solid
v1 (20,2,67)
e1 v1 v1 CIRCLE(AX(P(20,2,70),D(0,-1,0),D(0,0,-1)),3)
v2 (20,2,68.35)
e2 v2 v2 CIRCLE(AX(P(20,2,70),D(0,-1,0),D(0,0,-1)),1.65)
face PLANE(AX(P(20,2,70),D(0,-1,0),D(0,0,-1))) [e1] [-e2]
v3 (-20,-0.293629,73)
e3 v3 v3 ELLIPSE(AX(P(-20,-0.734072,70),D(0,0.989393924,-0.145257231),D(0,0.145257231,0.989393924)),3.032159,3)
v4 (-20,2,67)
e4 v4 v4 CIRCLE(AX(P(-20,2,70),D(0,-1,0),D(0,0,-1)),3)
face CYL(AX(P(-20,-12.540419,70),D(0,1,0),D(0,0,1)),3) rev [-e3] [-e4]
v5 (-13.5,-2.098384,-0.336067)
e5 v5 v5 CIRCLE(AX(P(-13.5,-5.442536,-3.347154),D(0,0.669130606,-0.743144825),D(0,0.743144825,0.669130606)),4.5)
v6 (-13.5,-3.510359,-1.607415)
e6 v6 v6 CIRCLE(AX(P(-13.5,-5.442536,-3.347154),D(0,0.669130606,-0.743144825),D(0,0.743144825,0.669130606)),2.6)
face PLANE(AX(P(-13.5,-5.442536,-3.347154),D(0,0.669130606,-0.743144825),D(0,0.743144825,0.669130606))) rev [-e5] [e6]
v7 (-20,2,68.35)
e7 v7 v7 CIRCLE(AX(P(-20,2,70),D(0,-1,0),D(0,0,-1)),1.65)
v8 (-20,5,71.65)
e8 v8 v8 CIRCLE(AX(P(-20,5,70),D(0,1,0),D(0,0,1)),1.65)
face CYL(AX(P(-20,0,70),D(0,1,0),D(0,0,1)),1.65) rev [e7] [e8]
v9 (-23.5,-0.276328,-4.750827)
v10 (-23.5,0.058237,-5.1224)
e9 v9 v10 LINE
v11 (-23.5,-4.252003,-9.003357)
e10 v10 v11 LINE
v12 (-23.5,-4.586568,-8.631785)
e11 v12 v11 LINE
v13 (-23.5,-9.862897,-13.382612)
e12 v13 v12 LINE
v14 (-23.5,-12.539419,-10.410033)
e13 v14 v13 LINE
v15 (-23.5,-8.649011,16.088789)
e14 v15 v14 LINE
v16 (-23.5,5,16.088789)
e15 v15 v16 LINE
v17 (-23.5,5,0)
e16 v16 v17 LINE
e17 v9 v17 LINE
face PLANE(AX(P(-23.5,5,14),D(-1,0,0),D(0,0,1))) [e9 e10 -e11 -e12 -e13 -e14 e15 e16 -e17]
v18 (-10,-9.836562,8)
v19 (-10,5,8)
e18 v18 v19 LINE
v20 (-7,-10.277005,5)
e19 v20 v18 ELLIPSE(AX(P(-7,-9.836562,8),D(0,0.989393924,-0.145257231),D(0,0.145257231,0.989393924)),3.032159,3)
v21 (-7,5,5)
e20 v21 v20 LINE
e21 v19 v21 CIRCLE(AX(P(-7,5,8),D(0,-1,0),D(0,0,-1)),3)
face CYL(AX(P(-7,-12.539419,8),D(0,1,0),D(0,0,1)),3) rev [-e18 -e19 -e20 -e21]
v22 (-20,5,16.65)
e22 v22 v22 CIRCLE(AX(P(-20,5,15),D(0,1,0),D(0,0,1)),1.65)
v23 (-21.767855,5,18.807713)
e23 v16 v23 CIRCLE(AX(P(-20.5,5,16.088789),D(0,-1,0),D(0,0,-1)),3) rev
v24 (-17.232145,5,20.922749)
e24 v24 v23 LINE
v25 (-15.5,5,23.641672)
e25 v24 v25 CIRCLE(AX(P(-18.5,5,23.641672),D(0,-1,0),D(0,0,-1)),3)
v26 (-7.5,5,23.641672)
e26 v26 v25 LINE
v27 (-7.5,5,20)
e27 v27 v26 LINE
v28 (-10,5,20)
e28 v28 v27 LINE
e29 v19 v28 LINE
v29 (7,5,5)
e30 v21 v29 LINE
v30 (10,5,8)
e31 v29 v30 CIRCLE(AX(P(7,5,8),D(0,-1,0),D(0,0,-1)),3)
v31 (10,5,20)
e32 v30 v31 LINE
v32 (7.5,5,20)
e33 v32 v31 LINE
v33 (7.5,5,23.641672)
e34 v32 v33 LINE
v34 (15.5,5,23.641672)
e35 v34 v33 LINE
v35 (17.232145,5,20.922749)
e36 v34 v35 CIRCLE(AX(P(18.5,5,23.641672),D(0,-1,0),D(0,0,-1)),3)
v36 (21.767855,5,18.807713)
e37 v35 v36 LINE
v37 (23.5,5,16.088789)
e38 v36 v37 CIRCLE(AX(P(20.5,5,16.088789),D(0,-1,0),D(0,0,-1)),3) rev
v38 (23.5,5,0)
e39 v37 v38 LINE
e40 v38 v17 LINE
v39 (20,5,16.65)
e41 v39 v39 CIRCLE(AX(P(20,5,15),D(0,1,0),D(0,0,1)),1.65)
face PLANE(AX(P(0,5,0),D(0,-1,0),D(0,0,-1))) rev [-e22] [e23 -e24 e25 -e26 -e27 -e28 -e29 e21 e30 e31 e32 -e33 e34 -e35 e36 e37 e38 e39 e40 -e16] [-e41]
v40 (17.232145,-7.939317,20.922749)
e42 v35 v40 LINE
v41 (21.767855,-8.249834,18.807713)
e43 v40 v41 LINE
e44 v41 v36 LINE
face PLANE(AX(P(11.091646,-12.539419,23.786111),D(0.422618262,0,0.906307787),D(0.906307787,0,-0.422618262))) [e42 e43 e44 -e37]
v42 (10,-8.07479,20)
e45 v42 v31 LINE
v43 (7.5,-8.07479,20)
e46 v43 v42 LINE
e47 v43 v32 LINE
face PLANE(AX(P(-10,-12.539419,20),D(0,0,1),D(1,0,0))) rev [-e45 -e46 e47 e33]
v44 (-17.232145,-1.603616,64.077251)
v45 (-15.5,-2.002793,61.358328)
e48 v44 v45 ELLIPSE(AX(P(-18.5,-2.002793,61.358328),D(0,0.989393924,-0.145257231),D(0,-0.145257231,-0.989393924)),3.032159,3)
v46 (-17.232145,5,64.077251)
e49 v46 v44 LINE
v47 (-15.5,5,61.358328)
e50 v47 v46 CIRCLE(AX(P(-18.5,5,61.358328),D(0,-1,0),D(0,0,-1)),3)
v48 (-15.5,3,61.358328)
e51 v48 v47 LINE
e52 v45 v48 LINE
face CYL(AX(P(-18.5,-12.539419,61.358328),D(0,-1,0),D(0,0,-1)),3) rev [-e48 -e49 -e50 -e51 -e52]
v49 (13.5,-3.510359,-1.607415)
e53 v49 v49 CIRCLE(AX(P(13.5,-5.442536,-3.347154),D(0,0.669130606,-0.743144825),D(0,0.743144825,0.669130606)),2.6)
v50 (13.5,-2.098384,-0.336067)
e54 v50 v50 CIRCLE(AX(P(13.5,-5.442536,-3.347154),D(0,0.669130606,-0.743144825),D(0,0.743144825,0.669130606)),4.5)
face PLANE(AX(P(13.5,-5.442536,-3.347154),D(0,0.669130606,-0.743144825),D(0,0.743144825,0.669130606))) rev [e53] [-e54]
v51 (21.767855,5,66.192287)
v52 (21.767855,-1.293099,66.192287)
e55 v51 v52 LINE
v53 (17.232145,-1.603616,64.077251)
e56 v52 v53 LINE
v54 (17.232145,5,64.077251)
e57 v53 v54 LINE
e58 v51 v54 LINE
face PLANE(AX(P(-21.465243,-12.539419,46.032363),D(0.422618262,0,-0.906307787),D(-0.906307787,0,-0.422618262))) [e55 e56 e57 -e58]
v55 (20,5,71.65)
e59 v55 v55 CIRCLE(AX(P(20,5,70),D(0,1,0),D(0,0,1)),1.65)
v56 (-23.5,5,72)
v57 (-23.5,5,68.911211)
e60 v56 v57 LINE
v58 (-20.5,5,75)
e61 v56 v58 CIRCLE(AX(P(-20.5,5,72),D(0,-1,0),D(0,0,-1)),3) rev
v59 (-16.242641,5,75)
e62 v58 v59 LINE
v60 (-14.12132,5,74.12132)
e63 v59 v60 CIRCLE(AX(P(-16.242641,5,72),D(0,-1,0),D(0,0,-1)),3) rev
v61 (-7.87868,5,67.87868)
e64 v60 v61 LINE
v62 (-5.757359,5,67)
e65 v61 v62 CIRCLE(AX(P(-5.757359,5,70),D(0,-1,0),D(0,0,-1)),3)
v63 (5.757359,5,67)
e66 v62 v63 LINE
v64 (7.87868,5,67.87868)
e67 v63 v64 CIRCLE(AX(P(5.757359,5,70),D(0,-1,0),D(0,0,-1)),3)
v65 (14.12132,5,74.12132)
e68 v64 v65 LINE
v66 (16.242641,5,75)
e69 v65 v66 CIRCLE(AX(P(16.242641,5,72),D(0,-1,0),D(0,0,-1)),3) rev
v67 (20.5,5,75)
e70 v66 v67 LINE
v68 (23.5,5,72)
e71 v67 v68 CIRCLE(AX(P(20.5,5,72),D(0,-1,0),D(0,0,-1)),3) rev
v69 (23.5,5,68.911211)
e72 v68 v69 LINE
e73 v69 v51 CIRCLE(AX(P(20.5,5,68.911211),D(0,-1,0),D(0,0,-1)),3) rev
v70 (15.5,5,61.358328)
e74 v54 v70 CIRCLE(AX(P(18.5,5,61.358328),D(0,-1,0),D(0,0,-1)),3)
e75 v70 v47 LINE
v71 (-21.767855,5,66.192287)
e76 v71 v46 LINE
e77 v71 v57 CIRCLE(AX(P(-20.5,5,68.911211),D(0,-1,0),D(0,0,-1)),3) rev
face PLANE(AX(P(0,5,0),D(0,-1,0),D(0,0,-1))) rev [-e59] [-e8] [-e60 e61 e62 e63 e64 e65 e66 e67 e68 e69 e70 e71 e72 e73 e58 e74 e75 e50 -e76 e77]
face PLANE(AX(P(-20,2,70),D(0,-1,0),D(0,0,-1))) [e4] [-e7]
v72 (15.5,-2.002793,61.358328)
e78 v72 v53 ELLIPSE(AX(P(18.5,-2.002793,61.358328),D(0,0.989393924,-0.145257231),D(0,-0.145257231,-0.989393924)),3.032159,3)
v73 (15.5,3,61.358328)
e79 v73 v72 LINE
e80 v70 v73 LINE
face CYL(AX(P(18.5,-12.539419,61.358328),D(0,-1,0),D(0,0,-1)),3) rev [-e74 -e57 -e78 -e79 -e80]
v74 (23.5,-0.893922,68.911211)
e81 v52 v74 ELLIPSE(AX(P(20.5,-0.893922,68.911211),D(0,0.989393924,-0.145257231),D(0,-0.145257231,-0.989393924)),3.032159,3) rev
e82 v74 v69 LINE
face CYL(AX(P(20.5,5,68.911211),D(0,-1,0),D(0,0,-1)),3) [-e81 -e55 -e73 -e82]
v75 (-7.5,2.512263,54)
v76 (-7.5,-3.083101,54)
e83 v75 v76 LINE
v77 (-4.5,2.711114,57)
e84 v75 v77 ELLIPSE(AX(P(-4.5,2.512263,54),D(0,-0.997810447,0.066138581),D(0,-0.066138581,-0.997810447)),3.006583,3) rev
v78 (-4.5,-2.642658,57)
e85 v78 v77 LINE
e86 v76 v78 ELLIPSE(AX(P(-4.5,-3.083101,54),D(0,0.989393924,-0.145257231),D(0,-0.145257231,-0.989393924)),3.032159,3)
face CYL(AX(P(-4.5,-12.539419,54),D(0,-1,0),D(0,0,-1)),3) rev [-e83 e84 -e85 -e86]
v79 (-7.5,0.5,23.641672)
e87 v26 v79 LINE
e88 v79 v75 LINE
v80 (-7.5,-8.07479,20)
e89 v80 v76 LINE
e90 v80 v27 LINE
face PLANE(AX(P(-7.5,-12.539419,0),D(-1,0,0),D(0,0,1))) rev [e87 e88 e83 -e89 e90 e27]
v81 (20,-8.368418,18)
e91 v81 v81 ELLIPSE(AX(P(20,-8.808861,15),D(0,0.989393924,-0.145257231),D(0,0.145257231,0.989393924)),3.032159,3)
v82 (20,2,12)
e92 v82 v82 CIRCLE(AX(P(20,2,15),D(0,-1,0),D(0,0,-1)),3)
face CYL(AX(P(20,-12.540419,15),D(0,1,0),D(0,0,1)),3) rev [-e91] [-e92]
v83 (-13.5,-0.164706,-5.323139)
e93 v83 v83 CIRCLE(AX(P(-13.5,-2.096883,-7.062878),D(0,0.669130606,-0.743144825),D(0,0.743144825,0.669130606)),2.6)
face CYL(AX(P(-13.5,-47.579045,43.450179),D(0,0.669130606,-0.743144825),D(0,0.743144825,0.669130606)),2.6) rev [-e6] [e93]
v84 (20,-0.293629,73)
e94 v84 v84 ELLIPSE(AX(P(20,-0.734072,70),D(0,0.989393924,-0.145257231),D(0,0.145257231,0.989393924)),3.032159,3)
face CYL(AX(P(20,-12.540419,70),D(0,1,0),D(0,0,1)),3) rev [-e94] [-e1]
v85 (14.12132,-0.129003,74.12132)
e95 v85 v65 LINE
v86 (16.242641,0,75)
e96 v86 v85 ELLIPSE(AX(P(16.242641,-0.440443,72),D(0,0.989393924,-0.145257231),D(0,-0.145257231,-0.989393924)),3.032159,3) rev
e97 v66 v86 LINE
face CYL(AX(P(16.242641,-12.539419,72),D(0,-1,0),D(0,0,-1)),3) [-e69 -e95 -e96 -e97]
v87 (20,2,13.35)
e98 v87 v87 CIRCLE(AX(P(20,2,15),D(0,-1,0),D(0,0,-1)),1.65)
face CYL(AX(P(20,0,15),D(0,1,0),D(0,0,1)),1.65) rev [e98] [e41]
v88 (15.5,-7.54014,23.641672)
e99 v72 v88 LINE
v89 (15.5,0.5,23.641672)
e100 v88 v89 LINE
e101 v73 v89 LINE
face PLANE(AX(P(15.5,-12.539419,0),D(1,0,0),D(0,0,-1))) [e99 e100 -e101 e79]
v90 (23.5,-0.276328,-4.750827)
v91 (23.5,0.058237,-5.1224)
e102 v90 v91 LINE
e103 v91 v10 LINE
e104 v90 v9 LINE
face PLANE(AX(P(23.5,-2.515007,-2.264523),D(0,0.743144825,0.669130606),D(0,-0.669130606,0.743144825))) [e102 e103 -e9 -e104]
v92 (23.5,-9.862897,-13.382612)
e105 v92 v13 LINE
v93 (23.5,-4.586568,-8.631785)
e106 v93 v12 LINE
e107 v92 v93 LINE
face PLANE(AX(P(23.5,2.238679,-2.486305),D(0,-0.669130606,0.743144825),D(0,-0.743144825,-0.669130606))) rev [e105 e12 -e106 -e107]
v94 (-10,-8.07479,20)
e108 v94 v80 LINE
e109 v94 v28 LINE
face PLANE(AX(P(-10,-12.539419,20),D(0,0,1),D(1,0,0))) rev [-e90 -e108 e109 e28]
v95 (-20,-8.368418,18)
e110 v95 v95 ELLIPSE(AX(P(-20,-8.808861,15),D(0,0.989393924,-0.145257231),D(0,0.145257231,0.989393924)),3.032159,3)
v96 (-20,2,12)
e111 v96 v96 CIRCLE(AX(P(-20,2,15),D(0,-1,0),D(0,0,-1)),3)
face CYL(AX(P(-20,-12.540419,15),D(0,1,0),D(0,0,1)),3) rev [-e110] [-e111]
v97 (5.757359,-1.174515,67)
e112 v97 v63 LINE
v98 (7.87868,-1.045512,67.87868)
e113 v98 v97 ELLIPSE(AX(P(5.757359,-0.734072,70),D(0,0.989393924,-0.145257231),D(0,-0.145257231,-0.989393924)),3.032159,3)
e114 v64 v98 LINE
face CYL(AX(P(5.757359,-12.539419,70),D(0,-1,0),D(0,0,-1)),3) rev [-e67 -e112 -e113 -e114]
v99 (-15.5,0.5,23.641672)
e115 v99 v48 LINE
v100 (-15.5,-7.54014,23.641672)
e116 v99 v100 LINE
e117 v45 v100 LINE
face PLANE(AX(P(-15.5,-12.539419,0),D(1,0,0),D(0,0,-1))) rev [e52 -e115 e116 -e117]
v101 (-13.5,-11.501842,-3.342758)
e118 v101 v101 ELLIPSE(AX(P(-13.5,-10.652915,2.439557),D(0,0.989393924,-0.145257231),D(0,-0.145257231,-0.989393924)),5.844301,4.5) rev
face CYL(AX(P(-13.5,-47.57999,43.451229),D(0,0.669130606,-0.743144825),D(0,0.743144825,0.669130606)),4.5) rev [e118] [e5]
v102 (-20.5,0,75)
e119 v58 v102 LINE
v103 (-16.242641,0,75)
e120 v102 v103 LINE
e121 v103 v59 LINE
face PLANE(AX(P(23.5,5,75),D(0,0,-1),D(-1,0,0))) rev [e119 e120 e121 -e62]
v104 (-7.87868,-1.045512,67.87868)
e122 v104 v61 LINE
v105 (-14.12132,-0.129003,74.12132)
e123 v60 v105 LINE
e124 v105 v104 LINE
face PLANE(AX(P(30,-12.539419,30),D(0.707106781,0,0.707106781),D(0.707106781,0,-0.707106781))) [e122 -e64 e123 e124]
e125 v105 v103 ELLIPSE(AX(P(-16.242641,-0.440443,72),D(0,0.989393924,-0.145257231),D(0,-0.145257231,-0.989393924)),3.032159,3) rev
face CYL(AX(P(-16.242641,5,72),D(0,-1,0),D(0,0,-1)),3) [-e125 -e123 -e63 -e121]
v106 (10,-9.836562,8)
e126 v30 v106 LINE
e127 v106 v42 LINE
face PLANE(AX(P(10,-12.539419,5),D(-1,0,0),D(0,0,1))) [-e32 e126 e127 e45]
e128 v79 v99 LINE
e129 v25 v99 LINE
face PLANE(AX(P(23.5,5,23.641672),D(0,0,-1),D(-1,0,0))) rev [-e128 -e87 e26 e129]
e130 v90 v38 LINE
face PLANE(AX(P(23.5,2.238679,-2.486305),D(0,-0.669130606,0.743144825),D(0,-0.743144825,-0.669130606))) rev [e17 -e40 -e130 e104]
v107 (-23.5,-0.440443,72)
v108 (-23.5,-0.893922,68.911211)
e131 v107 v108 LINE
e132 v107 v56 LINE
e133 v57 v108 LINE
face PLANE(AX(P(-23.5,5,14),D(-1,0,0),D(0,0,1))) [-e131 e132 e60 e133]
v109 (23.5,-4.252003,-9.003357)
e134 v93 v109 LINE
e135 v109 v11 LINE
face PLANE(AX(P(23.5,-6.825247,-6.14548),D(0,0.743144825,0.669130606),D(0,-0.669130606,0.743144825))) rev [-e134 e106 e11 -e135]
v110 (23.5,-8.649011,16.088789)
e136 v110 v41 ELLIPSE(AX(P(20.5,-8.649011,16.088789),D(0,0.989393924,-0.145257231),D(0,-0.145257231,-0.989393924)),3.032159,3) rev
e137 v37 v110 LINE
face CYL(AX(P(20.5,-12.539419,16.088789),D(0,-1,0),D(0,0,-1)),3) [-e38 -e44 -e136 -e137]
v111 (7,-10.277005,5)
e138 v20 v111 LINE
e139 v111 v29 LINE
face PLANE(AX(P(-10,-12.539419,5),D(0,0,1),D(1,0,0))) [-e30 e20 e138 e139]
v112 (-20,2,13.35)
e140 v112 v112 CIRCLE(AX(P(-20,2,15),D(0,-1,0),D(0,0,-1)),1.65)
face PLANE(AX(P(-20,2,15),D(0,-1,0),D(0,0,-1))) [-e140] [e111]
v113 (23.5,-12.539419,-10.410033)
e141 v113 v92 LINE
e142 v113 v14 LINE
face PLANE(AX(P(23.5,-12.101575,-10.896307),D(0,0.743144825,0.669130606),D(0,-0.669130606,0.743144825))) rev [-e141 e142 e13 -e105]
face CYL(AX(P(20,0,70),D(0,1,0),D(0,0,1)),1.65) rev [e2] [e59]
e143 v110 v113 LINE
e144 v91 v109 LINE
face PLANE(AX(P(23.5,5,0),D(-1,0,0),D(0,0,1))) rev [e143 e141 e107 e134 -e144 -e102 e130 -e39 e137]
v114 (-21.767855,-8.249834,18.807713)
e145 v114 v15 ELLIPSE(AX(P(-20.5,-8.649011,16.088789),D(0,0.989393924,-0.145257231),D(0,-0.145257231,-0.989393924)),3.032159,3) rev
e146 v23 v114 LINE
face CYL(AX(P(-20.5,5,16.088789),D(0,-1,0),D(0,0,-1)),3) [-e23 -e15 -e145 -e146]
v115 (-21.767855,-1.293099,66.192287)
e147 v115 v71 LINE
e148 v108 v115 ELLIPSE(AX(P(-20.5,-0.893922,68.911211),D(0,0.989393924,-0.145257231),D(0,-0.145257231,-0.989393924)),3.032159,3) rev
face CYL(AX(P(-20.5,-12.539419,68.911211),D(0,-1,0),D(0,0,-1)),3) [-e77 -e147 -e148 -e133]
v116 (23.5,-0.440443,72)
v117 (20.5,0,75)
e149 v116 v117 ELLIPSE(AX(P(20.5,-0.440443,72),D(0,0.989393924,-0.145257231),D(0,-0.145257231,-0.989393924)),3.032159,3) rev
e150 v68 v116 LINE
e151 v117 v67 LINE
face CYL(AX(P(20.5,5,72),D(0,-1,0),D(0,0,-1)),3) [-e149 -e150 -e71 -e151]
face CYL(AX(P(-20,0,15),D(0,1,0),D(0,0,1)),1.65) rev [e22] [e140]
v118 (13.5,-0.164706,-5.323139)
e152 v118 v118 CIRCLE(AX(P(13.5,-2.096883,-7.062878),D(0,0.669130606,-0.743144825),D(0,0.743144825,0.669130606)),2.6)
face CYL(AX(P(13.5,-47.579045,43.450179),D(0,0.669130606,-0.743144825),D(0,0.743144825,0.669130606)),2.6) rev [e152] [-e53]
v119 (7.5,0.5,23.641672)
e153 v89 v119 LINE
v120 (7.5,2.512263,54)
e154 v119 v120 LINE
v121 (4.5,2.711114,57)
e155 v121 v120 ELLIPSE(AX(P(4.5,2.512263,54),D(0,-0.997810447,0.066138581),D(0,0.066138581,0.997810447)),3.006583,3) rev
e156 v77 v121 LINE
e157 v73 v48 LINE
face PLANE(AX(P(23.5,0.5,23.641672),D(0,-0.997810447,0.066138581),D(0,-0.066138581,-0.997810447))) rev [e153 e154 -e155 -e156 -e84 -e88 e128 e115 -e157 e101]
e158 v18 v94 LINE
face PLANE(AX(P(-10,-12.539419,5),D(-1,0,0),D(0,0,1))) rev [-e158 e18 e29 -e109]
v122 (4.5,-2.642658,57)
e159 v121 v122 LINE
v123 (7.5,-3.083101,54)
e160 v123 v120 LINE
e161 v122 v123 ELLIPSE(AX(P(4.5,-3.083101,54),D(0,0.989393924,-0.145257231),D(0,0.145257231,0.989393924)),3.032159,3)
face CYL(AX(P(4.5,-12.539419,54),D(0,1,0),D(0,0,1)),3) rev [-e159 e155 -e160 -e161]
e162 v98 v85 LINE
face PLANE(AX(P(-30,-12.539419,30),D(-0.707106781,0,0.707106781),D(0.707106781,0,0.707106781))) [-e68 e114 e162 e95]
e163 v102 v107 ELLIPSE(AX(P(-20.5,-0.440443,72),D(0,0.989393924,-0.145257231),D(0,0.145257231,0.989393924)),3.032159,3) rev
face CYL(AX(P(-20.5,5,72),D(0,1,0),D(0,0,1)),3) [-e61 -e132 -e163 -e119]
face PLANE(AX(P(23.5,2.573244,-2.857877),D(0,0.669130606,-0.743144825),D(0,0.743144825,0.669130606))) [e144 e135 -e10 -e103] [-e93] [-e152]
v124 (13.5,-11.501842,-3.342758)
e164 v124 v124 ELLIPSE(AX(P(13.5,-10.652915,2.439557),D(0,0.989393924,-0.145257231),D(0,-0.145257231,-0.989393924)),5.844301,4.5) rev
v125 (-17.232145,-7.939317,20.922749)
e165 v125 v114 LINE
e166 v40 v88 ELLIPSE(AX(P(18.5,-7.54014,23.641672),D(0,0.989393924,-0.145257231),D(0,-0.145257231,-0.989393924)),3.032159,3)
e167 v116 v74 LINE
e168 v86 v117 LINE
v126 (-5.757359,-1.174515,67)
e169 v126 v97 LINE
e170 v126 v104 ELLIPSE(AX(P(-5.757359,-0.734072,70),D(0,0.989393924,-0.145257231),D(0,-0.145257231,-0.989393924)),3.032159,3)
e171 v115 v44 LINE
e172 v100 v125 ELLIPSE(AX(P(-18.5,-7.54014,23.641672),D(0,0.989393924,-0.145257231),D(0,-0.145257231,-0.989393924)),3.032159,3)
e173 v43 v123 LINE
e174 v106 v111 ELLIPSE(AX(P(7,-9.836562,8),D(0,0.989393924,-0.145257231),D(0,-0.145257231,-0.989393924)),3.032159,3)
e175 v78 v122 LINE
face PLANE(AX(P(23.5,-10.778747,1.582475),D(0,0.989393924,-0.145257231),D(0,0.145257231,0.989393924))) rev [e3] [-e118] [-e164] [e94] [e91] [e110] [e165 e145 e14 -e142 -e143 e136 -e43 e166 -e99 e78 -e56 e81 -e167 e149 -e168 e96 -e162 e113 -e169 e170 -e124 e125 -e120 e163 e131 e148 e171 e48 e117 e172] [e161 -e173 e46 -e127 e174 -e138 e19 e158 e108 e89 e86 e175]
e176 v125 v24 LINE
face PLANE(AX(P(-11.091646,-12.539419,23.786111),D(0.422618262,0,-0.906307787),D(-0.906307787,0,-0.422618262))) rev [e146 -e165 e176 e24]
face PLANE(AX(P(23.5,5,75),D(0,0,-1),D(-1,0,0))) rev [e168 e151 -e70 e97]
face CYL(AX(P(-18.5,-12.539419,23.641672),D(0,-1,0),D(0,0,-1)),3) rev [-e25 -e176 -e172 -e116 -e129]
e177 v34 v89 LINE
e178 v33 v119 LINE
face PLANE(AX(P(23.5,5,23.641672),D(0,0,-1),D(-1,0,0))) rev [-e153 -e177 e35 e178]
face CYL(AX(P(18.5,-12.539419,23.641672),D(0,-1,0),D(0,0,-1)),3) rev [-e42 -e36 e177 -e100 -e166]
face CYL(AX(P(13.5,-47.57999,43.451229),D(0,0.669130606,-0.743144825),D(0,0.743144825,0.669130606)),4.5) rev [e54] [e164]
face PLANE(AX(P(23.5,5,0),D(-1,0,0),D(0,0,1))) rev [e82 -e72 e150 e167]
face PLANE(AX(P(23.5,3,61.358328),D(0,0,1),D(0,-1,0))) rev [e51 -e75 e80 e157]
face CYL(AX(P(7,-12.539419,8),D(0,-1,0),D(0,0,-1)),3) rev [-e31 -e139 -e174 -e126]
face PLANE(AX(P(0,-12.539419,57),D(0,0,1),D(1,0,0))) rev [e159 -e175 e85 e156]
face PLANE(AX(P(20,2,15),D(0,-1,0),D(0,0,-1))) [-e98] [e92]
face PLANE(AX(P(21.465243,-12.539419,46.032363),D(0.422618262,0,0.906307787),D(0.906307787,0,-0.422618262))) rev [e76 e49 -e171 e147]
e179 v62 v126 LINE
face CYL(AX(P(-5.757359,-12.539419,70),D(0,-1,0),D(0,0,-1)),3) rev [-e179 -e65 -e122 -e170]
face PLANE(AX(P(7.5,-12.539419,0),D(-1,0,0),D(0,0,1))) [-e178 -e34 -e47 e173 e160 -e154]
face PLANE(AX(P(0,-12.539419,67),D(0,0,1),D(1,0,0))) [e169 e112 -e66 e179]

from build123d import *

# Parameters (mm, degrees)
EXTRUDE_2_DEPTH     = 5
SKETCH_3_R          = 1.65
CUT_EXTRUDE_1_DEPTH = 79.754364958
EXTRUDE_3_DEPTH     = 23.5
SKETCH_6_R          = 2.6
CUT_EXTRUDE_3_DEPTH = 83.719354566
CUT_EXTRUDE_4_REACH = 89.719
CUT_EXTRUDE_START   = -5
SKETCH_7_R          = 4.5
CUT_EXTRUDE_5_REACH = 85.529
CUT_EXTRUDE_START_2 = 3
SKETCH_8_R          = 3
CUT_EXTRUDE_2_DEPTH = 81.528760183
FILLET_1_R          = 3
CUT_EXTRUDE_7_DEPTH = 86.458978623


with BuildPart() as part:
    # 草图2 → 凸台-拉伸2 (new body)
    with BuildSketch(Plane(origin=(0, 0, 0), x_dir=(1, 0, 0), z_dir=(0, 1, 0))):
        Polygon((0, 0), (23.5, 0), (23.5, -14), (23.5, -75), (0, -75), align=None)
    extrude_2 = extrude(amount=EXTRUDE_2_DEPTH)

    # 镜向1: 凸台-拉伸2 across plane
    add(extrude_2.mirror(Plane(origin=(0, 5, 75), x_dir=(0, 0, 1), z_dir=(1, 0, 0))))

    # 草图3 → 切除-拉伸1 (cut, through all)
    with BuildSketch(Plane(origin=(0, 5, 0), x_dir=(1, 0, 0), z_dir=(0, 1, 0))):
        with Locations(Location((-20, -15, 0), (0, 0, 270))):
            Circle(SKETCH_3_R)
        with Locations(Location((20, -15, 0), (0, 0, 270))):
            Circle(SKETCH_3_R)
        with Locations(Location((-20, -70, 0), (0, 0, 270))):
            Circle(SKETCH_3_R)
        with Locations(Location((20, -70, 0), (0, 0, 270))):
            Circle(SKETCH_3_R)
    extrude(amount=-CUT_EXTRUDE_1_DEPTH, mode=Mode.SUBTRACT)

    # 草图5 → 凸台-拉伸3 (add, symmetric)
    with BuildSketch(Plane(origin=(0, 0, 0), x_dir=(0, 0, -1), z_dir=(1, 0, 0))):
        Polygon((-75, 0), (10.410032825, -12.539418935), (13.382612127, -9.86289651), (0, 5), (0, 0), align=None)
        Polygon((4.750827305, -0.276328261), (8.631784822, -4.586568249), (9.003357235, -4.252002945), (5.122399718, 0.058237042), align=None)
    extrude(amount=EXTRUDE_3_DEPTH, both=True)

    # 草图6 → 切除-拉伸3 (cut, through all)
    with BuildSketch(Plane(origin=(0, 2.573244145, -2.857877151), x_dir=(1, 0, 0), z_dir=(0, 0.6691306063588544, -0.7431448254773979))):
        with Locations(Location((-13.5, 6.284275873, 0), (0, 0, 270))):
            Circle(SKETCH_6_R)
        with Locations(Location((13.5, 6.284275873, 0), (0, 0, 270))):
            Circle(SKETCH_6_R)
    extrude(amount=-CUT_EXTRUDE_3_DEPTH, mode=Mode.SUBTRACT)

    # 切除-拉伸4: up to this plane
    cut_extrude_4_end = Plane(origin=(23.5, -10.778746663, 1.582474746), z_dir=(0, 0.9893939239349117, -0.145257231423012))
    # 草图7 → 切除-拉伸4 (cut, up to the surface)
    with BuildSketch(Plane(origin=(0, 2.573244145, -2.857877151), x_dir=(1, 0, 0), z_dir=(0, 0.6691306063588544, -0.7431448254773979)).offset(CUT_EXTRUDE_START), mode=Mode.PRIVATE) as cut_extrude_4_sk1:
        with Locations(Location((-13.5, 6.284275873, 0), (0, 0, 270))):
            Circle(SKETCH_7_R)
    cut_extrude_4_tool1 = split(extrude(cut_extrude_4_sk1.sketch, amount=-CUT_EXTRUDE_4_REACH, mode=Mode.PRIVATE), bisect_by=cut_extrude_4_end, keep=Keep.BOTH, mode=Mode.PRIVATE)
    add(cut_extrude_4_tool1.solids().sort_by_distance((-13.5, -5.442536, -3.347154))[0], mode=Mode.SUBTRACT)
    # 草图7 → 切除-拉伸4 (cut, up to the surface)
    with BuildSketch(Plane(origin=(0, 2.573244145, -2.857877151), x_dir=(1, 0, 0), z_dir=(0, 0.6691306063588544, -0.7431448254773979)).offset(CUT_EXTRUDE_START), mode=Mode.PRIVATE) as cut_extrude_4_sk2:
        with Locations(Location((13.5, 6.284275873, 0), (0, 0, 270))):
            Circle(SKETCH_7_R)
    cut_extrude_4_tool2 = split(extrude(cut_extrude_4_sk2.sketch, amount=-CUT_EXTRUDE_4_REACH, mode=Mode.PRIVATE), bisect_by=cut_extrude_4_end, keep=Keep.BOTH, mode=Mode.PRIVATE)
    add(cut_extrude_4_tool2.solids().sort_by_distance((13.5, -5.442536, -3.347154))[0], mode=Mode.SUBTRACT)

    # 切除-拉伸5: up to this plane
    cut_extrude_5_end = Plane(origin=(23.5, -10.778746663, 1.582474746), z_dir=(0, 0.9893939239349117, -0.145257231423012))
    # 草图8 → 切除-拉伸5 (cut, up to the surface)
    with BuildSketch(Plane.XZ.offset(-5).offset(CUT_EXTRUDE_START_2), mode=Mode.PRIVATE) as cut_extrude_5_sk1:
        with Locations(Location((-20, 15, 0), (0, 0, 90))):
            Circle(SKETCH_8_R)
    cut_extrude_5_tool1 = split(extrude(cut_extrude_5_sk1.sketch, amount=CUT_EXTRUDE_5_REACH, mode=Mode.PRIVATE), bisect_by=cut_extrude_5_end, keep=Keep.BOTH, mode=Mode.PRIVATE)
    add(cut_extrude_5_tool1.solids().sort_by_distance((-20, 2, 15))[0], mode=Mode.SUBTRACT)
    # 草图8 → 切除-拉伸5 (cut, up to the surface)
    with BuildSketch(Plane.XZ.offset(-5).offset(CUT_EXTRUDE_START_2), mode=Mode.PRIVATE) as cut_extrude_5_sk2:
        with Locations(Location((20, 15, 0), (0, 0, 90))):
            Circle(SKETCH_8_R)
    cut_extrude_5_tool2 = split(extrude(cut_extrude_5_sk2.sketch, amount=CUT_EXTRUDE_5_REACH, mode=Mode.PRIVATE), bisect_by=cut_extrude_5_end, keep=Keep.BOTH, mode=Mode.PRIVATE)
    add(cut_extrude_5_tool2.solids().sort_by_distance((20, 2, 15))[0], mode=Mode.SUBTRACT)
    # 草图8 → 切除-拉伸5 (cut, up to the surface)
    with BuildSketch(Plane.XZ.offset(-5).offset(CUT_EXTRUDE_START_2), mode=Mode.PRIVATE) as cut_extrude_5_sk3:
        with Locations(Location((20, 70, 0), (0, 0, 90))):
            Circle(SKETCH_8_R)
    cut_extrude_5_tool3 = split(extrude(cut_extrude_5_sk3.sketch, amount=CUT_EXTRUDE_5_REACH, mode=Mode.PRIVATE), bisect_by=cut_extrude_5_end, keep=Keep.BOTH, mode=Mode.PRIVATE)
    add(cut_extrude_5_tool3.solids().sort_by_distance((20, 2, 70))[0], mode=Mode.SUBTRACT)
    # 草图8 → 切除-拉伸5 (cut, up to the surface)
    with BuildSketch(Plane.XZ.offset(-5).offset(CUT_EXTRUDE_START_2), mode=Mode.PRIVATE) as cut_extrude_5_sk4:
        with Locations(Location((-20, 70, 0), (0, 0, 90))):
            Circle(SKETCH_8_R)
    cut_extrude_5_tool4 = split(extrude(cut_extrude_5_sk4.sketch, amount=CUT_EXTRUDE_5_REACH, mode=Mode.PRIVATE), bisect_by=cut_extrude_5_end, keep=Keep.BOTH, mode=Mode.PRIVATE)
    add(cut_extrude_5_tool4.solids().sort_by_distance((-20, 2, 70))[0], mode=Mode.SUBTRACT)

    # 草图4 → 切除-拉伸2 (cut, through all)
    with BuildSketch(Plane(origin=(0, 5, 0), x_dir=(1, 0, 0), z_dir=(0, 1, 0))):
        Polygon((-10, -5), (-10, -20), (-7.5, -20), (-7.5, -57), (7.5, -57), (7.5, -20), (10, -20), (10, -5), align=None)
        Polygon((-7, -67), (-15, -75), (15, -75), (7, -67), align=None)
        Polygon((-23.5, -18), (-23.5, -67), (-15.5, -63.269538735), (-15.5, -21.730461265), align=None)
        Polygon((23.5, -18), (15.5, -21.730461265), (15.5, -63.269538735), (23.5, -67), align=None)
    extrude(amount=-CUT_EXTRUDE_2_DEPTH, mode=Mode.SUBTRACT)

    # 圆角1
    # the kernel refuses this fillet: 3 mm, written as the material it adds along each edge
    with BuildSketch(Plane(origin=(7.5, 5, 57), x_dir=(0, 0, -1), z_dir=(0, -1, 0))) as fillet_1_piece_1_section:
        with BuildLine():
            CenterArc((FILLET_1_R, -FILLET_1_R), FILLET_1_R, 90, 90)
            Line((0, -FILLET_1_R), (0, 0))
            Line((0, 0), (FILLET_1_R, 0))
        make_face()
    fillet_1_piece_1 = extrude(amount=15.142658402, mode=Mode.PRIVATE)
    fillet_1_piece_1 = split(fillet_1_piece_1, bisect_by=Plane(origin=(6.825500476, -2.66184405, 56.869320354), z_dir=(0, 0.9893939239349115, -0.14525723142301197)), keep=Keep.TOP, mode=Mode.PRIVATE)
    add(fillet_1_piece_1)
    with BuildSketch(Plane(origin=(-7.5, 5, 57), x_dir=(1, 0, 0), z_dir=(0, -1, 0))) as fillet_1_piece_2_section:
        with BuildLine():
            CenterArc((FILLET_1_R, -FILLET_1_R), FILLET_1_R, 90, 90)
            Line((0, -FILLET_1_R), (0, 0))
            Line((0, 0), (FILLET_1_R, 0))
        make_face()
    fillet_1_piece_2 = extrude(amount=15.142658402, mode=Mode.PRIVATE)
    fillet_1_piece_2 = split(fillet_1_piece_2, bisect_by=Plane(origin=(-6.825500476, -2.66184405, 56.869320354), z_dir=(0, 0.9893939239349115, -0.14525723142301197)), keep=Keep.TOP, mode=Mode.PRIVATE)
    add(fillet_1_piece_2)
    with BuildSketch(Plane(origin=(15.5, 5, 21.730461265), x_dir=(0.9063077870366475, 0, -0.4226182617407048), z_dir=(0, -1, 0))) as fillet_1_piece_3_section:
        with BuildLine():
            CenterArc((FILLET_1_R * 0.637070260807, FILLET_1_R), FILLET_1_R, 205, 65)
            Line((-FILLET_1_R * 0.269237526229, FILLET_1_R * 0.577381738259), (0, 0))
            Line((0, 0), (FILLET_1_R * 0.637070260807, 0))
        make_face()
    fillet_1_piece_3 = extrude(amount=17.598759961, mode=Mode.PRIVATE)
    fillet_1_piece_3 = split(fillet_1_piece_3, bisect_by=Plane(origin=(15.879555916, -7.651082655, 22.886004601), z_dir=(0, 0.9893939239349115, -0.14525723142301197)), keep=Keep.TOP, mode=Mode.PRIVATE)
    add(fillet_1_piece_3)
    with BuildSketch(Plane(origin=(15.5, 5, 63.269538735), x_dir=(0.9063077870366488, 0, 0.4226182617407019), z_dir=(0, -1, 0))) as fillet_1_piece_4_section:
        with BuildLine():
            CenterArc((FILLET_1_R * 0.637070260807, -FILLET_1_R), FILLET_1_R, 90, 65)
            Line((-FILLET_1_R * 0.269237526229, -FILLET_1_R * 0.577381738259), (0, 0))
            Line((0, 0), (FILLET_1_R * 0.637070260807, 0))
        make_face()
    fillet_1_piece_4 = extrude(amount=11.500227068, mode=Mode.PRIVATE)
    fillet_1_piece_4 = split(fillet_1_piece_4, bisect_by=Plane(origin=(15.87363951, -1.687245158, 63.507628217), z_dir=(0, 0.9893939239349115, -0.14525723142301197)), keep=Keep.TOP, mode=Mode.PRIVATE)
    add(fillet_1_piece_4)
    with BuildSketch(Plane(origin=(7, 5, 67), x_dir=(-1, 0, 0), z_dir=(0, -1, 0))) as fillet_1_piece_5_section:
        with BuildLine():
            CenterArc((FILLET_1_R * 0.414213562373, -FILLET_1_R), FILLET_1_R, 90, 45)
            Line((-FILLET_1_R * 0.292893218813, -FILLET_1_R * 0.292893218813), (0, 0))
            Line((0, 0), (FILLET_1_R * 0.414213562373, 0))
        make_face()
    fillet_1_piece_5 = extrude(amount=9.281116563, mode=Mode.PRIVATE)
    fillet_1_piece_5 = split(fillet_1_piece_5, bisect_by=Plane(origin=(6.92099422, -1.082611782, 67.625981449), z_dir=(0, 0.9893939239349115, -0.14525723142301197)), keep=Keep.TOP, mode=Mode.PRIVATE)
    add(fillet_1_piece_5)
    with BuildSketch(Plane(origin=(-7, 5, 67), x_dir=(-0.7071067811865526, 0, 0.7071067811865426), z_dir=(0, -1, 0))) as fillet_1_piece_6_section:
        with BuildLine():
            CenterArc((FILLET_1_R * 0.414213562373, -FILLET_1_R), FILLET_1_R, 90, 45)
            Line((-FILLET_1_R * 0.292893218813, -FILLET_1_R * 0.292893218813), (0, 0))
            Line((0, 0), (FILLET_1_R * 0.414213562373, 0))
        make_face()
    fillet_1_piece_6 = extrude(amount=9.281116563, mode=Mode.PRIVATE)
    fillet_1_piece_6 = split(fillet_1_piece_6, bisect_by=Plane(origin=(-6.92099422, -1.082611782, 67.625981449), z_dir=(0, 0.9893939239349115, -0.14525723142301197)), keep=Keep.TOP, mode=Mode.PRIVATE)
    add(fillet_1_piece_6)
    with BuildSketch(Plane(origin=(-15.5, 5, 63.269538735), x_dir=(0, 0, -1), z_dir=(0, -1, 0))) as fillet_1_piece_7_section:
        with BuildLine():
            CenterArc((FILLET_1_R * 0.637070260807, -FILLET_1_R), FILLET_1_R, 90, 65)
            Line((-FILLET_1_R * 0.269237526229, -FILLET_1_R * 0.577381738259), (0, 0))
            Line((0, 0), (FILLET_1_R * 0.637070260807, 0))
        make_face()
    fillet_1_piece_7 = extrude(amount=11.500227068, mode=Mode.PRIVATE)
    fillet_1_piece_7 = split(fillet_1_piece_7, bisect_by=Plane(origin=(-15.87363951, -1.687245158, 63.507628217), z_dir=(0, 0.9893939239349115, -0.14525723142301197)), keep=Keep.TOP, mode=Mode.PRIVATE)
    add(fillet_1_piece_7)
    with BuildSketch(Plane(origin=(-15.5, 5, 21.730461265), x_dir=(-0.9063077870366472, 0, -0.42261826174070566), z_dir=(0, -1, 0))) as fillet_1_piece_8_section:
        with BuildLine():
            CenterArc((FILLET_1_R * 0.637070260807, -FILLET_1_R), FILLET_1_R, 90, 65)
            Line((-FILLET_1_R * 0.269237526229, -FILLET_1_R * 0.577381738259), (0, 0))
            Line((0, 0), (FILLET_1_R * 0.637070260807, 0))
        make_face()
    fillet_1_piece_8 = extrude(amount=17.598759961, mode=Mode.PRIVATE)
    fillet_1_piece_8 = split(fillet_1_piece_8, bisect_by=Plane(origin=(-15.879555916, -7.651082655, 22.886004601), z_dir=(0, 0.9893939239349115, -0.14525723142301197)), keep=Keep.TOP, mode=Mode.PRIVATE)
    add(fillet_1_piece_8)
    with BuildSketch(Plane(origin=(10, 5, 5), x_dir=(-1, 0, 0), z_dir=(0, -1, 0))) as fillet_1_piece_9_section:
        with BuildLine():
            CenterArc((FILLET_1_R, -FILLET_1_R), FILLET_1_R, 90, 90)
            Line((0, -FILLET_1_R), (0, 0))
            Line((0, 0), (FILLET_1_R, 0))
        make_face()
    fillet_1_piece_9 = extrude(amount=21.652323405, mode=Mode.PRIVATE)
    fillet_1_piece_9 = split(fillet_1_piece_9, bisect_by=Plane(origin=(9.315353327, -10.016611336, 6.773624643), z_dir=(0, 0.9893939239349115, -0.14525723142301197)), keep=Keep.TOP, mode=Mode.PRIVATE)
    fillet_1_piece_9 = fillet_1_piece_9 - Plane(origin=(13.5, -8.634898017, 0.198322878), x_dir=(0, 0.7431448254773979, 0.6691306063588544), z_dir=(0, 0.6691306063588544, -0.7431448254773979)) * Cylinder(4.5, 56, mode=Mode.PRIVATE)
    add(fillet_1_piece_9)
    with BuildSketch(Plane(origin=(-10, 5, 5), x_dir=(1, 0, 0), z_dir=(0, -1, 0))) as fillet_1_piece_10_section:
        with BuildLine():
            CenterArc((FILLET_1_R, FILLET_1_R), FILLET_1_R, 180, 90)
            Line((0, FILLET_1_R), (0, 0))
            Line((0, 0), (FILLET_1_R, 0))
        make_face()
    fillet_1_piece_10 = extrude(amount=21.652323405, mode=Mode.PRIVATE)
    fillet_1_piece_10 = split(fillet_1_piece_10, bisect_by=Plane(origin=(-9.315353327, -10.016611336, 6.773624645), z_dir=(0, 0.9893939239349115, -0.14525723142301197)), keep=Keep.TOP, mode=Mode.PRIVATE)
    fillet_1_piece_10 = fillet_1_piece_10 - Plane(origin=(-13.5, -8.634898015, 0.198322875), x_dir=(0, 0.7431448254773979, 0.6691306063588544), z_dir=(0, 0.6691306063588544, -0.7431448254773979)) * Cylinder(4.5, 56, mode=Mode.PRIVATE)
    add(fillet_1_piece_10)
    # the kernel refuses this fillet: 3 mm, written as the material it takes off along each edge
    with BuildSketch(Plane(origin=(23.5, 9.778026956, 18), x_dir=(0, 0, -1), z_dir=(0, -1, 0))) as fillet_1_2_piece_1:
        with BuildLine():
            CenterArc((FILLET_1_R * 0.637070260807, -FILLET_1_R), FILLET_1_R, 90, 65)
            Line((-FILLET_1_R * 0.269237526229, -FILLET_1_R * 0.577381738259), (0, 0))
            Line((0, 0), (FILLET_1_R * 0.637070260807, 0))
        make_face()
    extrude(amount=22.924472184, mode=Mode.SUBTRACT)
    with BuildSketch(Plane(origin=(23.5, 9.778026956, 67), x_dir=(0, 0, 1), z_dir=(0, -1, 0)), Plane(origin=(-23.5, 9.778026956, 67), x_dir=(0.9063077870366487, 0, -0.4226182617407022), z_dir=(0, -1, 0))) as fillet_1_2_piece_2:
        with BuildLine():
            CenterArc((FILLET_1_R * 0.637070260807, FILLET_1_R), FILLET_1_R, 205, 65)
            Line((-FILLET_1_R * 0.269237526229, FILLET_1_R * 0.577381738259), (0, 0))
            Line((0, 0), (FILLET_1_R * 0.637070260807, 0))
        make_face()
    extrude(amount=15.730568757, mode=Mode.SUBTRACT)
    with BuildSketch(Plane(origin=(23.5, -7.5, 75), x_dir=(-1, 0, 0), z_dir=(0, 1, 0))) as fillet_1_2_piece_3:
        with BuildLine():
            CenterArc((FILLET_1_R, -FILLET_1_R), FILLET_1_R, 90, 90)
            Line((0, -FILLET_1_R), (0, 0))
            Line((0, 0), (FILLET_1_R, 0))
        make_face()
    extrude(amount=20, mode=Mode.SUBTRACT)
    with BuildSketch(Plane(origin=(15, 8.106601718, 75), x_dir=(-0.7071067811865526, 0, -0.7071067811865426), z_dir=(0, -1, 0)), Plane(origin=(-15, 8.106601718, 75), x_dir=(-1, 0, 0), z_dir=(0, -1, 0))) as fillet_1_2_piece_4:
        with BuildLine():
            CenterArc((FILLET_1_R * 0.414213562373, FILLET_1_R), FILLET_1_R, 225, 45)
            Line((-FILLET_1_R * 0.292893218813, FILLET_1_R * 0.292893218813), (0, 0))
            Line((0, 0), (FILLET_1_R * 0.414213562373, 0))
        make_face()
    extrude(amount=11.213203436, mode=Mode.SUBTRACT)
    with BuildSketch(Plane(origin=(-23.5, -7.5, 75), x_dir=(1, 0, 0), z_dir=(0, 1, 0))) as fillet_1_2_piece_5:
        with BuildLine():
            CenterArc((FILLET_1_R, FILLET_1_R), FILLET_1_R, 180, 90)
            Line((0, FILLET_1_R), (0, 0))
            Line((0, 0), (FILLET_1_R, 0))
        make_face()
    extrude(amount=20, mode=Mode.SUBTRACT)
    with BuildSketch(Plane(origin=(-23.5, 9.778026956, 18), x_dir=(0, 0, -1), z_dir=(0, -1, 0))) as fillet_1_2_piece_6:
        with BuildLine():
            CenterArc((FILLET_1_R * 0.637070260807, FILLET_1_R), FILLET_1_R, 205, 65)
            Line((-FILLET_1_R * 0.269237526229, FILLET_1_R * 0.577381738259), (0, 0))
            Line((0, 0), (FILLET_1_R * 0.637070260807, 0))
        make_face()
    extrude(amount=22.924472184, mode=Mode.SUBTRACT)

    # 草图10 → 切除-拉伸7 (cut, through all)
    with BuildSketch(Plane.ZY.offset(15.5)):
        Polygon((23.641672048, 5), (23.641672048, 0.5), (61.358327952, 3), (61.358327952, 5), align=None)
    extrude(amount=-CUT_EXTRUDE_7_DEPTH, mode=Mode.SUBTRACT)


solid = part.part
